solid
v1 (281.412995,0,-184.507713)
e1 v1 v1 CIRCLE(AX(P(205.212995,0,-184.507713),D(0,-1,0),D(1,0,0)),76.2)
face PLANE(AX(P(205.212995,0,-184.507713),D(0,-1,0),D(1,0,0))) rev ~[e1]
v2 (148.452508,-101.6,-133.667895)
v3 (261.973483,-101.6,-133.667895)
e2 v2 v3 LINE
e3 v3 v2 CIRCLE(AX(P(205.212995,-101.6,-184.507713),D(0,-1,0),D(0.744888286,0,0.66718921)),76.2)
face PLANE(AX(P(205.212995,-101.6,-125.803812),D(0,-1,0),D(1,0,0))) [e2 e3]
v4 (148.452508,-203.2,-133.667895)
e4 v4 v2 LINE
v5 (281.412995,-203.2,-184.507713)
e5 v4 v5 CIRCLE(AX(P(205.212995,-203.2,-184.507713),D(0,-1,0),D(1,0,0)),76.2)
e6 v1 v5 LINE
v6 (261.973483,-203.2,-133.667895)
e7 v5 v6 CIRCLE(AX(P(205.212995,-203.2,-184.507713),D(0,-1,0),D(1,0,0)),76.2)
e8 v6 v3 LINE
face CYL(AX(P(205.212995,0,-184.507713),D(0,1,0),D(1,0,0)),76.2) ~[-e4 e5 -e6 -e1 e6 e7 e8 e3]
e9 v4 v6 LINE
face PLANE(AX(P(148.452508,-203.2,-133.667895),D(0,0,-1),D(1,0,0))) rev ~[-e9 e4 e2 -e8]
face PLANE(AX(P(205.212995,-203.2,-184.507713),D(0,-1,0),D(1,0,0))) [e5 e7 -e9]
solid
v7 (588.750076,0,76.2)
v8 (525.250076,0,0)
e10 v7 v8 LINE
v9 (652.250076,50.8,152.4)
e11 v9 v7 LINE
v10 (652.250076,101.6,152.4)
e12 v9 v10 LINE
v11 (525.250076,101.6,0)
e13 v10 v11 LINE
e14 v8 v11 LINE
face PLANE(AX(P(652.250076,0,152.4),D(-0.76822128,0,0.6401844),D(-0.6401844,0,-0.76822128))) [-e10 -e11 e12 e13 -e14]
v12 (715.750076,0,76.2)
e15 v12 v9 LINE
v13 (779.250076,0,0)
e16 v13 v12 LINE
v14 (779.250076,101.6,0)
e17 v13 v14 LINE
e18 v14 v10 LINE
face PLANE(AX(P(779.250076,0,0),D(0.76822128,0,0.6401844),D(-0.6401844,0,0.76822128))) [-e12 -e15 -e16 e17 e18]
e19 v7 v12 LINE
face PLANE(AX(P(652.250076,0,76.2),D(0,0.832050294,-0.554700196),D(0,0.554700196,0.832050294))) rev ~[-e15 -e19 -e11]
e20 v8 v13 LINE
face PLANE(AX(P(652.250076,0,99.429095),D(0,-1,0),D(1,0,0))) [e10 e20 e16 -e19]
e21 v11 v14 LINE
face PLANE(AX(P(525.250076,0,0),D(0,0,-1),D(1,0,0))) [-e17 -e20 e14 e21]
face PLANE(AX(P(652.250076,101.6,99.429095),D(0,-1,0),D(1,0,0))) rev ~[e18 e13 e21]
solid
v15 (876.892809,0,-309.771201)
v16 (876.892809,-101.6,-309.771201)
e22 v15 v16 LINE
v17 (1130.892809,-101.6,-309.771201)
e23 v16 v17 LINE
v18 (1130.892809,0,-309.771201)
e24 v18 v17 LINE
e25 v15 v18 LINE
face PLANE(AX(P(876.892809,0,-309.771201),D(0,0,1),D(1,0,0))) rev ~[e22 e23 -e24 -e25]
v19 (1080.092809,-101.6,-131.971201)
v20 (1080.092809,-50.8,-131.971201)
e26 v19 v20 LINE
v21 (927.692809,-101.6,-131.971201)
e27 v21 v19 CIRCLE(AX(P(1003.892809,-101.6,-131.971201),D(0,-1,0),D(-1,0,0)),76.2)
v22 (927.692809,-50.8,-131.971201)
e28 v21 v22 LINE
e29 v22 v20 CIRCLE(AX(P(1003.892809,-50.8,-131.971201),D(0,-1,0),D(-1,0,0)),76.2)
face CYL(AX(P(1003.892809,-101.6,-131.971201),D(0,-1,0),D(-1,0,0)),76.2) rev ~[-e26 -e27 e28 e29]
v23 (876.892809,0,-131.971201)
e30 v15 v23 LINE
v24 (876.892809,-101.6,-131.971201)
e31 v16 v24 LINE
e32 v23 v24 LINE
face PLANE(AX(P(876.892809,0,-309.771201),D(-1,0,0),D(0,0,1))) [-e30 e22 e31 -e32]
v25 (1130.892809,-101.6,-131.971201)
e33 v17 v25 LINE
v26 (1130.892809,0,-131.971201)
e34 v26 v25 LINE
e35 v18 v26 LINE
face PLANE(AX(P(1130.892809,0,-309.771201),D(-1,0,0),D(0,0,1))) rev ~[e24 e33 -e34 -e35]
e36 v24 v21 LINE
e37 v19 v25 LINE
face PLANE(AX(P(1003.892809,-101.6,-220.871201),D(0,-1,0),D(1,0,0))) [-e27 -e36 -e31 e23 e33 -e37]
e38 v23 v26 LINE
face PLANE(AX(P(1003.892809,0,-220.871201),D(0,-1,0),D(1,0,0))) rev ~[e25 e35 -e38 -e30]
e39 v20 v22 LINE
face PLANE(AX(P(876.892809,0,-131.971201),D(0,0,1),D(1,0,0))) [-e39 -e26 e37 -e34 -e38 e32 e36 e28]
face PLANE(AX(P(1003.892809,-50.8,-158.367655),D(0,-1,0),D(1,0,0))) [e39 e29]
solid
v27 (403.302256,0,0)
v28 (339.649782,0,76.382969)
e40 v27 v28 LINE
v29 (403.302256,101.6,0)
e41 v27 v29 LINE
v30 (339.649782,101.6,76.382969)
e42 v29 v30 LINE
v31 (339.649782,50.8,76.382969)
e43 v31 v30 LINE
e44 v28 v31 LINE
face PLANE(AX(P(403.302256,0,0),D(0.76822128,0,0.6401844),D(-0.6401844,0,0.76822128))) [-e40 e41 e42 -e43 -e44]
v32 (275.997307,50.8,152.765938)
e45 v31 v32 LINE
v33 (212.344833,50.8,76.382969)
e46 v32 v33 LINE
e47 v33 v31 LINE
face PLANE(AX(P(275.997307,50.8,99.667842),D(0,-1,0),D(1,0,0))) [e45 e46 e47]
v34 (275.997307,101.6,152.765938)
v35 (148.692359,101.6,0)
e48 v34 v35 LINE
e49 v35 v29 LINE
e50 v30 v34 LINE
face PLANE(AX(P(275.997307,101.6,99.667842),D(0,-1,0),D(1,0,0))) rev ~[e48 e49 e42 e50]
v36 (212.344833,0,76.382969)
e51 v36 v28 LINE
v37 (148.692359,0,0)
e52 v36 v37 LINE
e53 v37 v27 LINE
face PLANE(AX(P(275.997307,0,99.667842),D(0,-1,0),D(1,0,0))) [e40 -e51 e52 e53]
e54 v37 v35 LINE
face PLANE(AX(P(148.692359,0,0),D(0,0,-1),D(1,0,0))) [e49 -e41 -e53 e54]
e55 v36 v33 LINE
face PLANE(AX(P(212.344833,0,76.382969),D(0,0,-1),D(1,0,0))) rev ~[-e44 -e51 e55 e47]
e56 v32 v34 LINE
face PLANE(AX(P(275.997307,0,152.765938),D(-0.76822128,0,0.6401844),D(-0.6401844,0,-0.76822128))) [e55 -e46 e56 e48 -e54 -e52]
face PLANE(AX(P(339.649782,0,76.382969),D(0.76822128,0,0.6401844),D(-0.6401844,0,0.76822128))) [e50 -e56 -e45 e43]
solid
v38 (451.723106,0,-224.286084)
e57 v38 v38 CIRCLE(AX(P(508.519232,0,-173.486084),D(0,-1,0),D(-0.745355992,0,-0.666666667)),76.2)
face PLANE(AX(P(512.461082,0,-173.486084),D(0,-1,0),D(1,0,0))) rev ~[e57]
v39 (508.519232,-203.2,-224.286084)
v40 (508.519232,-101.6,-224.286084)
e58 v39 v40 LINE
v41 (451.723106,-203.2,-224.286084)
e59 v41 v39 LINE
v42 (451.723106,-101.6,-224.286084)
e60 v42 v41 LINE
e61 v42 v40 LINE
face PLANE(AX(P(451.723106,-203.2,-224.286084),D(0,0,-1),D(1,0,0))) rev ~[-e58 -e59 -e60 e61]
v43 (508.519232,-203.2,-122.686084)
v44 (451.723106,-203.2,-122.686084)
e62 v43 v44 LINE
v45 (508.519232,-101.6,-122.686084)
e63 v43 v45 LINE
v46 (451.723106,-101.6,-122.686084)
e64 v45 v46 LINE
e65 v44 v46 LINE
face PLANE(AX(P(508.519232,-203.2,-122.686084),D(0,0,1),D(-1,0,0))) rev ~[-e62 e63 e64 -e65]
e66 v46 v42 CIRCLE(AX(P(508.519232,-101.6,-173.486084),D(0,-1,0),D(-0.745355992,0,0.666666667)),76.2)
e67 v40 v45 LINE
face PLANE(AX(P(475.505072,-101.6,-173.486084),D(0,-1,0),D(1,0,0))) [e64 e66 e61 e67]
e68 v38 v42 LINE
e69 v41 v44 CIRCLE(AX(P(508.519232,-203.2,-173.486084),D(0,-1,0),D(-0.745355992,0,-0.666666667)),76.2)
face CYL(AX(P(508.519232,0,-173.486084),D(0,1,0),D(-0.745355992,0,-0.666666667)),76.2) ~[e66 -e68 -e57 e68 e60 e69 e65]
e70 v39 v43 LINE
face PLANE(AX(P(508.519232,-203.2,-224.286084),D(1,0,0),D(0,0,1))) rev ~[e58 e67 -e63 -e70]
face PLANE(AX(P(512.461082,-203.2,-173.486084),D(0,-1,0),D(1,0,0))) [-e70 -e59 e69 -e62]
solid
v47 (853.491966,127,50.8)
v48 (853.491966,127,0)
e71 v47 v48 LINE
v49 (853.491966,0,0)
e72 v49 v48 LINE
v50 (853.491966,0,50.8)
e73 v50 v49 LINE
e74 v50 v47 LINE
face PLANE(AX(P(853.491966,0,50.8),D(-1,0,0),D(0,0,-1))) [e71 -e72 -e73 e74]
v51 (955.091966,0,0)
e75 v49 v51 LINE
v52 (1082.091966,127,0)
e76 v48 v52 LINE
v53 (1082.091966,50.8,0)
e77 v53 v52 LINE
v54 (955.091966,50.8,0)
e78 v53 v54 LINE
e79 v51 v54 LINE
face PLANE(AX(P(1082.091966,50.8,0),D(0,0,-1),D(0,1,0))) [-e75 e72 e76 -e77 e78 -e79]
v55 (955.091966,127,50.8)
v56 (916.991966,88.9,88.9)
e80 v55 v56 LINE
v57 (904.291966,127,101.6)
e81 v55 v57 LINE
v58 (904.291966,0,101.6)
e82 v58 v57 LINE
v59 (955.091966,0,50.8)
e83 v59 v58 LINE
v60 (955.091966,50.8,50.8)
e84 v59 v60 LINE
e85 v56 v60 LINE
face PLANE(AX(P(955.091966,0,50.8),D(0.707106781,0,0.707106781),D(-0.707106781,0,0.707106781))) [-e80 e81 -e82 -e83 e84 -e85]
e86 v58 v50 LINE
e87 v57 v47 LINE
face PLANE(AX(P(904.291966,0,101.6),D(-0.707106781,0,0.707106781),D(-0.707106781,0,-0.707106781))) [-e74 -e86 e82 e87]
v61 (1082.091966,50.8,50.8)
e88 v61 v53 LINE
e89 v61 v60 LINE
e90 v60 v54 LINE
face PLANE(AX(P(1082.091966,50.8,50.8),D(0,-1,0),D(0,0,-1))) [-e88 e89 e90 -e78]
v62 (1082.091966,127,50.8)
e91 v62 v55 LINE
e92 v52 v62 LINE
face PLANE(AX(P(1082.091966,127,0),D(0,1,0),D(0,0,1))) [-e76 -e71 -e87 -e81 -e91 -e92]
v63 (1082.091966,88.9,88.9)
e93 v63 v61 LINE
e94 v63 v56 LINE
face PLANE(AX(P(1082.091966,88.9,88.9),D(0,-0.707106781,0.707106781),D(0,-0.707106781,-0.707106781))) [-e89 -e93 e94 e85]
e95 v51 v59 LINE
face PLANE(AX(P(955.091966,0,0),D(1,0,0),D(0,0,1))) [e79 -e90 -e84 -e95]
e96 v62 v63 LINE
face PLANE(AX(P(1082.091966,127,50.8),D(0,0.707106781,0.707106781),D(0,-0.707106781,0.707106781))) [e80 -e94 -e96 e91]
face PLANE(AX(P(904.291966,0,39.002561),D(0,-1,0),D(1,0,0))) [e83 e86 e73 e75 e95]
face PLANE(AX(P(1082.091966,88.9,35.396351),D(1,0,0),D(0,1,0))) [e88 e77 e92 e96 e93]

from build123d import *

# Parameters (mm, degrees)
F1_DEPTH  = 101.6
F2_DEPTH  = 50.8
F3_DEPTH  = 101.6
F7_DEPTH  = 63.5
F9_DEPTH  = 127
F12_DEPTH = 165.1
F13_R     = 76.2
F14_DEPTH = 203.2
F16_DEPTH = 101.6
F18_DEPTH = 203.2
F20_DEPTH = 101.6
F21_W     = 254
F21_H     = 177.8
F22_DEPTH = 101.6
F24_DEPTH = 50.8


with BuildPart() as f1:
    # F0 (on Front) → F1 (new body)
    with BuildSketch(Plane.XZ):
        Polygon((275.9973074218, 152.7659382395), (212.3448331553, 76.3829691198), (339.6497816883, 76.3829691198), align=None)
        Polygon((212.3448331553, 76.3829691198), (148.6923588888, 0), (403.3022559547, 0), (339.6497816883, 76.3829691198), align=None)
    extrude(amount=-F1_DEPTH)

    # F0 (on Front) → F2 (cut)
    with BuildSketch(Plane.XZ):
        Polygon((275.9973074218, 152.7659382395), (212.3448331553, 76.3829691198), (339.6497816883, 76.3829691198), align=None)
    extrude(amount=-F2_DEPTH, mode=Mode.SUBTRACT)


with BuildPart() as f3:
    # F0 (on Front) → F3 (new body)
    with BuildSketch(Plane.XZ):
        Polygon((652.2500761549, 152.4), (588.7500761549, 76.2), (715.7500761549, 76.2), align=None)
        Polygon((588.7500761549, 76.2), (525.2500761549, 0), (779.2500761549, 0), (715.7500761549, 76.2), align=None)
    extrude(amount=-F3_DEPTH)

    # F6 (on 3pt) → F7 (cut, symmetric)
    with BuildSketch(Plane.YZ.offset(652.2500761549)):
        Polygon((0, 152.4), (0, 76.2), (50.8, 152.4), align=None)
    extrude(amount=F7_DEPTH, both=True, mode=Mode.SUBTRACT)


with BuildPart() as f9:
    # F8 (on Front) → F9 (new body)
    with BuildSketch(Plane.XZ):
        Polygon((853.4919664163, 50.8), (853.4919664163, 0), (955.0919664163, 0), (955.0919664163, 50.8), (904.2919664163, 101.6), align=None)
    extrude(amount=-F9_DEPTH)

    # F11 (on offset) → F12 (join)
    with BuildSketch(Plane.YZ.offset(1082.0919664163)):
        Polygon((50.8, 0), (127, 0), (127, 50.8), (88.9, 88.9), (50.8, 50.8), align=None)
    extrude(amount=-F12_DEPTH)


with BuildPart() as f14:
    # F13 (on Front) → F14 (new body)
    with BuildSketch(Plane.XZ):
        with Locations((205.21299541, -184.5077127218)):
            Circle(F13_R)
    extrude(amount=F14_DEPTH)

    # F15 (on face) → F16 (cut)
    with BuildSketch(Plane.XZ.offset(203.2)):
        with BuildLine():
            Line((148.4525080283, -133.667894939), (202.7499394524, -133.667894939))
            Line((202.7499394524, -133.667894939), (261.9734827917, -133.667894939))
            ThreePointArc((261.9734827917, -133.667894939), (205.21299541, -108.3077127218), (148.4525080283, -133.667894939))
        make_face()
    extrude(amount=-F16_DEPTH, mode=Mode.SUBTRACT)


with BuildPart() as f18:
    # F17 (on Front) → F18 (new body)
    with BuildSketch(Plane.XZ):
        with BuildLine():
            ThreePointArc((451.7231056446, -224.286083746), (535.7090755138, -244.6700174989), (584.7192322731, -173.486083746))
            ThreePointArc((584.7192322731, -173.486083746), (535.7090755138, -102.302149993), (451.7231056446, -122.686083746))
            Line((451.7231056446, -122.686083746), (508.5192322731, -122.686083746))
            Line((508.5192322731, -122.686083746), (508.5192322731, -224.286083746))
            Line((508.5192322731, -224.286083746), (451.7231056446, -224.286083746))
        make_face()
        with BuildLine():
            Line((508.5192322731, -122.686083746), (451.7231056446, -122.686083746))
            ThreePointArc((451.7231056446, -122.686083746), (432.3192322731, -173.486083746), (451.7231056446, -224.286083746))
            Line((451.7231056446, -224.286083746), (508.5192322731, -224.286083746))
            Line((508.5192322731, -224.286083746), (508.5192322731, -122.686083746))
        make_face()
    extrude(amount=F18_DEPTH)

    # F19 (on face) → F20 (cut)
    with BuildSketch(Plane.XZ.offset(203.2)):
        with BuildLine():
            Line((508.5192322731, -224.286083746), (508.5192322731, -122.686083746))
            Line((508.5192322731, -122.686083746), (451.7231056446, -122.686083746))
            ThreePointArc((451.7231056446, -122.686083746), (432.3192322731, -173.486083746), (451.7231056446, -224.286083746))
            Line((451.7231056446, -224.286083746), (508.5192322731, -224.286083746))
        make_face()
    extrude(amount=-F20_DEPTH, mode=Mode.SUBTRACT)


with BuildPart() as f22:
    # F21 (on Front) → F22 (new body)
    with BuildSketch(Plane.XZ):
        with Locations((1003.8928091526, -220.871200853)):
            Rectangle(F21_W, F21_H)
    extrude(amount=F22_DEPTH)

    # F23 (on face) → F24 (cut)
    with BuildSketch(Plane.XZ.offset(101.6)):
        with BuildLine():
            Line((1080.0928091526, -131.971200853), (927.6928091526, -131.971200853))
            ThreePointArc((927.6928091526, -131.971200853), (1003.8928091526, -208.171200853), (1080.0928091526, -131.971200853))
        make_face()
    extrude(amount=-F24_DEPTH, mode=Mode.SUBTRACT)


solid = Compound([f1.part, f3.part, f9.part, f14.part, f18.part, f22.part])
